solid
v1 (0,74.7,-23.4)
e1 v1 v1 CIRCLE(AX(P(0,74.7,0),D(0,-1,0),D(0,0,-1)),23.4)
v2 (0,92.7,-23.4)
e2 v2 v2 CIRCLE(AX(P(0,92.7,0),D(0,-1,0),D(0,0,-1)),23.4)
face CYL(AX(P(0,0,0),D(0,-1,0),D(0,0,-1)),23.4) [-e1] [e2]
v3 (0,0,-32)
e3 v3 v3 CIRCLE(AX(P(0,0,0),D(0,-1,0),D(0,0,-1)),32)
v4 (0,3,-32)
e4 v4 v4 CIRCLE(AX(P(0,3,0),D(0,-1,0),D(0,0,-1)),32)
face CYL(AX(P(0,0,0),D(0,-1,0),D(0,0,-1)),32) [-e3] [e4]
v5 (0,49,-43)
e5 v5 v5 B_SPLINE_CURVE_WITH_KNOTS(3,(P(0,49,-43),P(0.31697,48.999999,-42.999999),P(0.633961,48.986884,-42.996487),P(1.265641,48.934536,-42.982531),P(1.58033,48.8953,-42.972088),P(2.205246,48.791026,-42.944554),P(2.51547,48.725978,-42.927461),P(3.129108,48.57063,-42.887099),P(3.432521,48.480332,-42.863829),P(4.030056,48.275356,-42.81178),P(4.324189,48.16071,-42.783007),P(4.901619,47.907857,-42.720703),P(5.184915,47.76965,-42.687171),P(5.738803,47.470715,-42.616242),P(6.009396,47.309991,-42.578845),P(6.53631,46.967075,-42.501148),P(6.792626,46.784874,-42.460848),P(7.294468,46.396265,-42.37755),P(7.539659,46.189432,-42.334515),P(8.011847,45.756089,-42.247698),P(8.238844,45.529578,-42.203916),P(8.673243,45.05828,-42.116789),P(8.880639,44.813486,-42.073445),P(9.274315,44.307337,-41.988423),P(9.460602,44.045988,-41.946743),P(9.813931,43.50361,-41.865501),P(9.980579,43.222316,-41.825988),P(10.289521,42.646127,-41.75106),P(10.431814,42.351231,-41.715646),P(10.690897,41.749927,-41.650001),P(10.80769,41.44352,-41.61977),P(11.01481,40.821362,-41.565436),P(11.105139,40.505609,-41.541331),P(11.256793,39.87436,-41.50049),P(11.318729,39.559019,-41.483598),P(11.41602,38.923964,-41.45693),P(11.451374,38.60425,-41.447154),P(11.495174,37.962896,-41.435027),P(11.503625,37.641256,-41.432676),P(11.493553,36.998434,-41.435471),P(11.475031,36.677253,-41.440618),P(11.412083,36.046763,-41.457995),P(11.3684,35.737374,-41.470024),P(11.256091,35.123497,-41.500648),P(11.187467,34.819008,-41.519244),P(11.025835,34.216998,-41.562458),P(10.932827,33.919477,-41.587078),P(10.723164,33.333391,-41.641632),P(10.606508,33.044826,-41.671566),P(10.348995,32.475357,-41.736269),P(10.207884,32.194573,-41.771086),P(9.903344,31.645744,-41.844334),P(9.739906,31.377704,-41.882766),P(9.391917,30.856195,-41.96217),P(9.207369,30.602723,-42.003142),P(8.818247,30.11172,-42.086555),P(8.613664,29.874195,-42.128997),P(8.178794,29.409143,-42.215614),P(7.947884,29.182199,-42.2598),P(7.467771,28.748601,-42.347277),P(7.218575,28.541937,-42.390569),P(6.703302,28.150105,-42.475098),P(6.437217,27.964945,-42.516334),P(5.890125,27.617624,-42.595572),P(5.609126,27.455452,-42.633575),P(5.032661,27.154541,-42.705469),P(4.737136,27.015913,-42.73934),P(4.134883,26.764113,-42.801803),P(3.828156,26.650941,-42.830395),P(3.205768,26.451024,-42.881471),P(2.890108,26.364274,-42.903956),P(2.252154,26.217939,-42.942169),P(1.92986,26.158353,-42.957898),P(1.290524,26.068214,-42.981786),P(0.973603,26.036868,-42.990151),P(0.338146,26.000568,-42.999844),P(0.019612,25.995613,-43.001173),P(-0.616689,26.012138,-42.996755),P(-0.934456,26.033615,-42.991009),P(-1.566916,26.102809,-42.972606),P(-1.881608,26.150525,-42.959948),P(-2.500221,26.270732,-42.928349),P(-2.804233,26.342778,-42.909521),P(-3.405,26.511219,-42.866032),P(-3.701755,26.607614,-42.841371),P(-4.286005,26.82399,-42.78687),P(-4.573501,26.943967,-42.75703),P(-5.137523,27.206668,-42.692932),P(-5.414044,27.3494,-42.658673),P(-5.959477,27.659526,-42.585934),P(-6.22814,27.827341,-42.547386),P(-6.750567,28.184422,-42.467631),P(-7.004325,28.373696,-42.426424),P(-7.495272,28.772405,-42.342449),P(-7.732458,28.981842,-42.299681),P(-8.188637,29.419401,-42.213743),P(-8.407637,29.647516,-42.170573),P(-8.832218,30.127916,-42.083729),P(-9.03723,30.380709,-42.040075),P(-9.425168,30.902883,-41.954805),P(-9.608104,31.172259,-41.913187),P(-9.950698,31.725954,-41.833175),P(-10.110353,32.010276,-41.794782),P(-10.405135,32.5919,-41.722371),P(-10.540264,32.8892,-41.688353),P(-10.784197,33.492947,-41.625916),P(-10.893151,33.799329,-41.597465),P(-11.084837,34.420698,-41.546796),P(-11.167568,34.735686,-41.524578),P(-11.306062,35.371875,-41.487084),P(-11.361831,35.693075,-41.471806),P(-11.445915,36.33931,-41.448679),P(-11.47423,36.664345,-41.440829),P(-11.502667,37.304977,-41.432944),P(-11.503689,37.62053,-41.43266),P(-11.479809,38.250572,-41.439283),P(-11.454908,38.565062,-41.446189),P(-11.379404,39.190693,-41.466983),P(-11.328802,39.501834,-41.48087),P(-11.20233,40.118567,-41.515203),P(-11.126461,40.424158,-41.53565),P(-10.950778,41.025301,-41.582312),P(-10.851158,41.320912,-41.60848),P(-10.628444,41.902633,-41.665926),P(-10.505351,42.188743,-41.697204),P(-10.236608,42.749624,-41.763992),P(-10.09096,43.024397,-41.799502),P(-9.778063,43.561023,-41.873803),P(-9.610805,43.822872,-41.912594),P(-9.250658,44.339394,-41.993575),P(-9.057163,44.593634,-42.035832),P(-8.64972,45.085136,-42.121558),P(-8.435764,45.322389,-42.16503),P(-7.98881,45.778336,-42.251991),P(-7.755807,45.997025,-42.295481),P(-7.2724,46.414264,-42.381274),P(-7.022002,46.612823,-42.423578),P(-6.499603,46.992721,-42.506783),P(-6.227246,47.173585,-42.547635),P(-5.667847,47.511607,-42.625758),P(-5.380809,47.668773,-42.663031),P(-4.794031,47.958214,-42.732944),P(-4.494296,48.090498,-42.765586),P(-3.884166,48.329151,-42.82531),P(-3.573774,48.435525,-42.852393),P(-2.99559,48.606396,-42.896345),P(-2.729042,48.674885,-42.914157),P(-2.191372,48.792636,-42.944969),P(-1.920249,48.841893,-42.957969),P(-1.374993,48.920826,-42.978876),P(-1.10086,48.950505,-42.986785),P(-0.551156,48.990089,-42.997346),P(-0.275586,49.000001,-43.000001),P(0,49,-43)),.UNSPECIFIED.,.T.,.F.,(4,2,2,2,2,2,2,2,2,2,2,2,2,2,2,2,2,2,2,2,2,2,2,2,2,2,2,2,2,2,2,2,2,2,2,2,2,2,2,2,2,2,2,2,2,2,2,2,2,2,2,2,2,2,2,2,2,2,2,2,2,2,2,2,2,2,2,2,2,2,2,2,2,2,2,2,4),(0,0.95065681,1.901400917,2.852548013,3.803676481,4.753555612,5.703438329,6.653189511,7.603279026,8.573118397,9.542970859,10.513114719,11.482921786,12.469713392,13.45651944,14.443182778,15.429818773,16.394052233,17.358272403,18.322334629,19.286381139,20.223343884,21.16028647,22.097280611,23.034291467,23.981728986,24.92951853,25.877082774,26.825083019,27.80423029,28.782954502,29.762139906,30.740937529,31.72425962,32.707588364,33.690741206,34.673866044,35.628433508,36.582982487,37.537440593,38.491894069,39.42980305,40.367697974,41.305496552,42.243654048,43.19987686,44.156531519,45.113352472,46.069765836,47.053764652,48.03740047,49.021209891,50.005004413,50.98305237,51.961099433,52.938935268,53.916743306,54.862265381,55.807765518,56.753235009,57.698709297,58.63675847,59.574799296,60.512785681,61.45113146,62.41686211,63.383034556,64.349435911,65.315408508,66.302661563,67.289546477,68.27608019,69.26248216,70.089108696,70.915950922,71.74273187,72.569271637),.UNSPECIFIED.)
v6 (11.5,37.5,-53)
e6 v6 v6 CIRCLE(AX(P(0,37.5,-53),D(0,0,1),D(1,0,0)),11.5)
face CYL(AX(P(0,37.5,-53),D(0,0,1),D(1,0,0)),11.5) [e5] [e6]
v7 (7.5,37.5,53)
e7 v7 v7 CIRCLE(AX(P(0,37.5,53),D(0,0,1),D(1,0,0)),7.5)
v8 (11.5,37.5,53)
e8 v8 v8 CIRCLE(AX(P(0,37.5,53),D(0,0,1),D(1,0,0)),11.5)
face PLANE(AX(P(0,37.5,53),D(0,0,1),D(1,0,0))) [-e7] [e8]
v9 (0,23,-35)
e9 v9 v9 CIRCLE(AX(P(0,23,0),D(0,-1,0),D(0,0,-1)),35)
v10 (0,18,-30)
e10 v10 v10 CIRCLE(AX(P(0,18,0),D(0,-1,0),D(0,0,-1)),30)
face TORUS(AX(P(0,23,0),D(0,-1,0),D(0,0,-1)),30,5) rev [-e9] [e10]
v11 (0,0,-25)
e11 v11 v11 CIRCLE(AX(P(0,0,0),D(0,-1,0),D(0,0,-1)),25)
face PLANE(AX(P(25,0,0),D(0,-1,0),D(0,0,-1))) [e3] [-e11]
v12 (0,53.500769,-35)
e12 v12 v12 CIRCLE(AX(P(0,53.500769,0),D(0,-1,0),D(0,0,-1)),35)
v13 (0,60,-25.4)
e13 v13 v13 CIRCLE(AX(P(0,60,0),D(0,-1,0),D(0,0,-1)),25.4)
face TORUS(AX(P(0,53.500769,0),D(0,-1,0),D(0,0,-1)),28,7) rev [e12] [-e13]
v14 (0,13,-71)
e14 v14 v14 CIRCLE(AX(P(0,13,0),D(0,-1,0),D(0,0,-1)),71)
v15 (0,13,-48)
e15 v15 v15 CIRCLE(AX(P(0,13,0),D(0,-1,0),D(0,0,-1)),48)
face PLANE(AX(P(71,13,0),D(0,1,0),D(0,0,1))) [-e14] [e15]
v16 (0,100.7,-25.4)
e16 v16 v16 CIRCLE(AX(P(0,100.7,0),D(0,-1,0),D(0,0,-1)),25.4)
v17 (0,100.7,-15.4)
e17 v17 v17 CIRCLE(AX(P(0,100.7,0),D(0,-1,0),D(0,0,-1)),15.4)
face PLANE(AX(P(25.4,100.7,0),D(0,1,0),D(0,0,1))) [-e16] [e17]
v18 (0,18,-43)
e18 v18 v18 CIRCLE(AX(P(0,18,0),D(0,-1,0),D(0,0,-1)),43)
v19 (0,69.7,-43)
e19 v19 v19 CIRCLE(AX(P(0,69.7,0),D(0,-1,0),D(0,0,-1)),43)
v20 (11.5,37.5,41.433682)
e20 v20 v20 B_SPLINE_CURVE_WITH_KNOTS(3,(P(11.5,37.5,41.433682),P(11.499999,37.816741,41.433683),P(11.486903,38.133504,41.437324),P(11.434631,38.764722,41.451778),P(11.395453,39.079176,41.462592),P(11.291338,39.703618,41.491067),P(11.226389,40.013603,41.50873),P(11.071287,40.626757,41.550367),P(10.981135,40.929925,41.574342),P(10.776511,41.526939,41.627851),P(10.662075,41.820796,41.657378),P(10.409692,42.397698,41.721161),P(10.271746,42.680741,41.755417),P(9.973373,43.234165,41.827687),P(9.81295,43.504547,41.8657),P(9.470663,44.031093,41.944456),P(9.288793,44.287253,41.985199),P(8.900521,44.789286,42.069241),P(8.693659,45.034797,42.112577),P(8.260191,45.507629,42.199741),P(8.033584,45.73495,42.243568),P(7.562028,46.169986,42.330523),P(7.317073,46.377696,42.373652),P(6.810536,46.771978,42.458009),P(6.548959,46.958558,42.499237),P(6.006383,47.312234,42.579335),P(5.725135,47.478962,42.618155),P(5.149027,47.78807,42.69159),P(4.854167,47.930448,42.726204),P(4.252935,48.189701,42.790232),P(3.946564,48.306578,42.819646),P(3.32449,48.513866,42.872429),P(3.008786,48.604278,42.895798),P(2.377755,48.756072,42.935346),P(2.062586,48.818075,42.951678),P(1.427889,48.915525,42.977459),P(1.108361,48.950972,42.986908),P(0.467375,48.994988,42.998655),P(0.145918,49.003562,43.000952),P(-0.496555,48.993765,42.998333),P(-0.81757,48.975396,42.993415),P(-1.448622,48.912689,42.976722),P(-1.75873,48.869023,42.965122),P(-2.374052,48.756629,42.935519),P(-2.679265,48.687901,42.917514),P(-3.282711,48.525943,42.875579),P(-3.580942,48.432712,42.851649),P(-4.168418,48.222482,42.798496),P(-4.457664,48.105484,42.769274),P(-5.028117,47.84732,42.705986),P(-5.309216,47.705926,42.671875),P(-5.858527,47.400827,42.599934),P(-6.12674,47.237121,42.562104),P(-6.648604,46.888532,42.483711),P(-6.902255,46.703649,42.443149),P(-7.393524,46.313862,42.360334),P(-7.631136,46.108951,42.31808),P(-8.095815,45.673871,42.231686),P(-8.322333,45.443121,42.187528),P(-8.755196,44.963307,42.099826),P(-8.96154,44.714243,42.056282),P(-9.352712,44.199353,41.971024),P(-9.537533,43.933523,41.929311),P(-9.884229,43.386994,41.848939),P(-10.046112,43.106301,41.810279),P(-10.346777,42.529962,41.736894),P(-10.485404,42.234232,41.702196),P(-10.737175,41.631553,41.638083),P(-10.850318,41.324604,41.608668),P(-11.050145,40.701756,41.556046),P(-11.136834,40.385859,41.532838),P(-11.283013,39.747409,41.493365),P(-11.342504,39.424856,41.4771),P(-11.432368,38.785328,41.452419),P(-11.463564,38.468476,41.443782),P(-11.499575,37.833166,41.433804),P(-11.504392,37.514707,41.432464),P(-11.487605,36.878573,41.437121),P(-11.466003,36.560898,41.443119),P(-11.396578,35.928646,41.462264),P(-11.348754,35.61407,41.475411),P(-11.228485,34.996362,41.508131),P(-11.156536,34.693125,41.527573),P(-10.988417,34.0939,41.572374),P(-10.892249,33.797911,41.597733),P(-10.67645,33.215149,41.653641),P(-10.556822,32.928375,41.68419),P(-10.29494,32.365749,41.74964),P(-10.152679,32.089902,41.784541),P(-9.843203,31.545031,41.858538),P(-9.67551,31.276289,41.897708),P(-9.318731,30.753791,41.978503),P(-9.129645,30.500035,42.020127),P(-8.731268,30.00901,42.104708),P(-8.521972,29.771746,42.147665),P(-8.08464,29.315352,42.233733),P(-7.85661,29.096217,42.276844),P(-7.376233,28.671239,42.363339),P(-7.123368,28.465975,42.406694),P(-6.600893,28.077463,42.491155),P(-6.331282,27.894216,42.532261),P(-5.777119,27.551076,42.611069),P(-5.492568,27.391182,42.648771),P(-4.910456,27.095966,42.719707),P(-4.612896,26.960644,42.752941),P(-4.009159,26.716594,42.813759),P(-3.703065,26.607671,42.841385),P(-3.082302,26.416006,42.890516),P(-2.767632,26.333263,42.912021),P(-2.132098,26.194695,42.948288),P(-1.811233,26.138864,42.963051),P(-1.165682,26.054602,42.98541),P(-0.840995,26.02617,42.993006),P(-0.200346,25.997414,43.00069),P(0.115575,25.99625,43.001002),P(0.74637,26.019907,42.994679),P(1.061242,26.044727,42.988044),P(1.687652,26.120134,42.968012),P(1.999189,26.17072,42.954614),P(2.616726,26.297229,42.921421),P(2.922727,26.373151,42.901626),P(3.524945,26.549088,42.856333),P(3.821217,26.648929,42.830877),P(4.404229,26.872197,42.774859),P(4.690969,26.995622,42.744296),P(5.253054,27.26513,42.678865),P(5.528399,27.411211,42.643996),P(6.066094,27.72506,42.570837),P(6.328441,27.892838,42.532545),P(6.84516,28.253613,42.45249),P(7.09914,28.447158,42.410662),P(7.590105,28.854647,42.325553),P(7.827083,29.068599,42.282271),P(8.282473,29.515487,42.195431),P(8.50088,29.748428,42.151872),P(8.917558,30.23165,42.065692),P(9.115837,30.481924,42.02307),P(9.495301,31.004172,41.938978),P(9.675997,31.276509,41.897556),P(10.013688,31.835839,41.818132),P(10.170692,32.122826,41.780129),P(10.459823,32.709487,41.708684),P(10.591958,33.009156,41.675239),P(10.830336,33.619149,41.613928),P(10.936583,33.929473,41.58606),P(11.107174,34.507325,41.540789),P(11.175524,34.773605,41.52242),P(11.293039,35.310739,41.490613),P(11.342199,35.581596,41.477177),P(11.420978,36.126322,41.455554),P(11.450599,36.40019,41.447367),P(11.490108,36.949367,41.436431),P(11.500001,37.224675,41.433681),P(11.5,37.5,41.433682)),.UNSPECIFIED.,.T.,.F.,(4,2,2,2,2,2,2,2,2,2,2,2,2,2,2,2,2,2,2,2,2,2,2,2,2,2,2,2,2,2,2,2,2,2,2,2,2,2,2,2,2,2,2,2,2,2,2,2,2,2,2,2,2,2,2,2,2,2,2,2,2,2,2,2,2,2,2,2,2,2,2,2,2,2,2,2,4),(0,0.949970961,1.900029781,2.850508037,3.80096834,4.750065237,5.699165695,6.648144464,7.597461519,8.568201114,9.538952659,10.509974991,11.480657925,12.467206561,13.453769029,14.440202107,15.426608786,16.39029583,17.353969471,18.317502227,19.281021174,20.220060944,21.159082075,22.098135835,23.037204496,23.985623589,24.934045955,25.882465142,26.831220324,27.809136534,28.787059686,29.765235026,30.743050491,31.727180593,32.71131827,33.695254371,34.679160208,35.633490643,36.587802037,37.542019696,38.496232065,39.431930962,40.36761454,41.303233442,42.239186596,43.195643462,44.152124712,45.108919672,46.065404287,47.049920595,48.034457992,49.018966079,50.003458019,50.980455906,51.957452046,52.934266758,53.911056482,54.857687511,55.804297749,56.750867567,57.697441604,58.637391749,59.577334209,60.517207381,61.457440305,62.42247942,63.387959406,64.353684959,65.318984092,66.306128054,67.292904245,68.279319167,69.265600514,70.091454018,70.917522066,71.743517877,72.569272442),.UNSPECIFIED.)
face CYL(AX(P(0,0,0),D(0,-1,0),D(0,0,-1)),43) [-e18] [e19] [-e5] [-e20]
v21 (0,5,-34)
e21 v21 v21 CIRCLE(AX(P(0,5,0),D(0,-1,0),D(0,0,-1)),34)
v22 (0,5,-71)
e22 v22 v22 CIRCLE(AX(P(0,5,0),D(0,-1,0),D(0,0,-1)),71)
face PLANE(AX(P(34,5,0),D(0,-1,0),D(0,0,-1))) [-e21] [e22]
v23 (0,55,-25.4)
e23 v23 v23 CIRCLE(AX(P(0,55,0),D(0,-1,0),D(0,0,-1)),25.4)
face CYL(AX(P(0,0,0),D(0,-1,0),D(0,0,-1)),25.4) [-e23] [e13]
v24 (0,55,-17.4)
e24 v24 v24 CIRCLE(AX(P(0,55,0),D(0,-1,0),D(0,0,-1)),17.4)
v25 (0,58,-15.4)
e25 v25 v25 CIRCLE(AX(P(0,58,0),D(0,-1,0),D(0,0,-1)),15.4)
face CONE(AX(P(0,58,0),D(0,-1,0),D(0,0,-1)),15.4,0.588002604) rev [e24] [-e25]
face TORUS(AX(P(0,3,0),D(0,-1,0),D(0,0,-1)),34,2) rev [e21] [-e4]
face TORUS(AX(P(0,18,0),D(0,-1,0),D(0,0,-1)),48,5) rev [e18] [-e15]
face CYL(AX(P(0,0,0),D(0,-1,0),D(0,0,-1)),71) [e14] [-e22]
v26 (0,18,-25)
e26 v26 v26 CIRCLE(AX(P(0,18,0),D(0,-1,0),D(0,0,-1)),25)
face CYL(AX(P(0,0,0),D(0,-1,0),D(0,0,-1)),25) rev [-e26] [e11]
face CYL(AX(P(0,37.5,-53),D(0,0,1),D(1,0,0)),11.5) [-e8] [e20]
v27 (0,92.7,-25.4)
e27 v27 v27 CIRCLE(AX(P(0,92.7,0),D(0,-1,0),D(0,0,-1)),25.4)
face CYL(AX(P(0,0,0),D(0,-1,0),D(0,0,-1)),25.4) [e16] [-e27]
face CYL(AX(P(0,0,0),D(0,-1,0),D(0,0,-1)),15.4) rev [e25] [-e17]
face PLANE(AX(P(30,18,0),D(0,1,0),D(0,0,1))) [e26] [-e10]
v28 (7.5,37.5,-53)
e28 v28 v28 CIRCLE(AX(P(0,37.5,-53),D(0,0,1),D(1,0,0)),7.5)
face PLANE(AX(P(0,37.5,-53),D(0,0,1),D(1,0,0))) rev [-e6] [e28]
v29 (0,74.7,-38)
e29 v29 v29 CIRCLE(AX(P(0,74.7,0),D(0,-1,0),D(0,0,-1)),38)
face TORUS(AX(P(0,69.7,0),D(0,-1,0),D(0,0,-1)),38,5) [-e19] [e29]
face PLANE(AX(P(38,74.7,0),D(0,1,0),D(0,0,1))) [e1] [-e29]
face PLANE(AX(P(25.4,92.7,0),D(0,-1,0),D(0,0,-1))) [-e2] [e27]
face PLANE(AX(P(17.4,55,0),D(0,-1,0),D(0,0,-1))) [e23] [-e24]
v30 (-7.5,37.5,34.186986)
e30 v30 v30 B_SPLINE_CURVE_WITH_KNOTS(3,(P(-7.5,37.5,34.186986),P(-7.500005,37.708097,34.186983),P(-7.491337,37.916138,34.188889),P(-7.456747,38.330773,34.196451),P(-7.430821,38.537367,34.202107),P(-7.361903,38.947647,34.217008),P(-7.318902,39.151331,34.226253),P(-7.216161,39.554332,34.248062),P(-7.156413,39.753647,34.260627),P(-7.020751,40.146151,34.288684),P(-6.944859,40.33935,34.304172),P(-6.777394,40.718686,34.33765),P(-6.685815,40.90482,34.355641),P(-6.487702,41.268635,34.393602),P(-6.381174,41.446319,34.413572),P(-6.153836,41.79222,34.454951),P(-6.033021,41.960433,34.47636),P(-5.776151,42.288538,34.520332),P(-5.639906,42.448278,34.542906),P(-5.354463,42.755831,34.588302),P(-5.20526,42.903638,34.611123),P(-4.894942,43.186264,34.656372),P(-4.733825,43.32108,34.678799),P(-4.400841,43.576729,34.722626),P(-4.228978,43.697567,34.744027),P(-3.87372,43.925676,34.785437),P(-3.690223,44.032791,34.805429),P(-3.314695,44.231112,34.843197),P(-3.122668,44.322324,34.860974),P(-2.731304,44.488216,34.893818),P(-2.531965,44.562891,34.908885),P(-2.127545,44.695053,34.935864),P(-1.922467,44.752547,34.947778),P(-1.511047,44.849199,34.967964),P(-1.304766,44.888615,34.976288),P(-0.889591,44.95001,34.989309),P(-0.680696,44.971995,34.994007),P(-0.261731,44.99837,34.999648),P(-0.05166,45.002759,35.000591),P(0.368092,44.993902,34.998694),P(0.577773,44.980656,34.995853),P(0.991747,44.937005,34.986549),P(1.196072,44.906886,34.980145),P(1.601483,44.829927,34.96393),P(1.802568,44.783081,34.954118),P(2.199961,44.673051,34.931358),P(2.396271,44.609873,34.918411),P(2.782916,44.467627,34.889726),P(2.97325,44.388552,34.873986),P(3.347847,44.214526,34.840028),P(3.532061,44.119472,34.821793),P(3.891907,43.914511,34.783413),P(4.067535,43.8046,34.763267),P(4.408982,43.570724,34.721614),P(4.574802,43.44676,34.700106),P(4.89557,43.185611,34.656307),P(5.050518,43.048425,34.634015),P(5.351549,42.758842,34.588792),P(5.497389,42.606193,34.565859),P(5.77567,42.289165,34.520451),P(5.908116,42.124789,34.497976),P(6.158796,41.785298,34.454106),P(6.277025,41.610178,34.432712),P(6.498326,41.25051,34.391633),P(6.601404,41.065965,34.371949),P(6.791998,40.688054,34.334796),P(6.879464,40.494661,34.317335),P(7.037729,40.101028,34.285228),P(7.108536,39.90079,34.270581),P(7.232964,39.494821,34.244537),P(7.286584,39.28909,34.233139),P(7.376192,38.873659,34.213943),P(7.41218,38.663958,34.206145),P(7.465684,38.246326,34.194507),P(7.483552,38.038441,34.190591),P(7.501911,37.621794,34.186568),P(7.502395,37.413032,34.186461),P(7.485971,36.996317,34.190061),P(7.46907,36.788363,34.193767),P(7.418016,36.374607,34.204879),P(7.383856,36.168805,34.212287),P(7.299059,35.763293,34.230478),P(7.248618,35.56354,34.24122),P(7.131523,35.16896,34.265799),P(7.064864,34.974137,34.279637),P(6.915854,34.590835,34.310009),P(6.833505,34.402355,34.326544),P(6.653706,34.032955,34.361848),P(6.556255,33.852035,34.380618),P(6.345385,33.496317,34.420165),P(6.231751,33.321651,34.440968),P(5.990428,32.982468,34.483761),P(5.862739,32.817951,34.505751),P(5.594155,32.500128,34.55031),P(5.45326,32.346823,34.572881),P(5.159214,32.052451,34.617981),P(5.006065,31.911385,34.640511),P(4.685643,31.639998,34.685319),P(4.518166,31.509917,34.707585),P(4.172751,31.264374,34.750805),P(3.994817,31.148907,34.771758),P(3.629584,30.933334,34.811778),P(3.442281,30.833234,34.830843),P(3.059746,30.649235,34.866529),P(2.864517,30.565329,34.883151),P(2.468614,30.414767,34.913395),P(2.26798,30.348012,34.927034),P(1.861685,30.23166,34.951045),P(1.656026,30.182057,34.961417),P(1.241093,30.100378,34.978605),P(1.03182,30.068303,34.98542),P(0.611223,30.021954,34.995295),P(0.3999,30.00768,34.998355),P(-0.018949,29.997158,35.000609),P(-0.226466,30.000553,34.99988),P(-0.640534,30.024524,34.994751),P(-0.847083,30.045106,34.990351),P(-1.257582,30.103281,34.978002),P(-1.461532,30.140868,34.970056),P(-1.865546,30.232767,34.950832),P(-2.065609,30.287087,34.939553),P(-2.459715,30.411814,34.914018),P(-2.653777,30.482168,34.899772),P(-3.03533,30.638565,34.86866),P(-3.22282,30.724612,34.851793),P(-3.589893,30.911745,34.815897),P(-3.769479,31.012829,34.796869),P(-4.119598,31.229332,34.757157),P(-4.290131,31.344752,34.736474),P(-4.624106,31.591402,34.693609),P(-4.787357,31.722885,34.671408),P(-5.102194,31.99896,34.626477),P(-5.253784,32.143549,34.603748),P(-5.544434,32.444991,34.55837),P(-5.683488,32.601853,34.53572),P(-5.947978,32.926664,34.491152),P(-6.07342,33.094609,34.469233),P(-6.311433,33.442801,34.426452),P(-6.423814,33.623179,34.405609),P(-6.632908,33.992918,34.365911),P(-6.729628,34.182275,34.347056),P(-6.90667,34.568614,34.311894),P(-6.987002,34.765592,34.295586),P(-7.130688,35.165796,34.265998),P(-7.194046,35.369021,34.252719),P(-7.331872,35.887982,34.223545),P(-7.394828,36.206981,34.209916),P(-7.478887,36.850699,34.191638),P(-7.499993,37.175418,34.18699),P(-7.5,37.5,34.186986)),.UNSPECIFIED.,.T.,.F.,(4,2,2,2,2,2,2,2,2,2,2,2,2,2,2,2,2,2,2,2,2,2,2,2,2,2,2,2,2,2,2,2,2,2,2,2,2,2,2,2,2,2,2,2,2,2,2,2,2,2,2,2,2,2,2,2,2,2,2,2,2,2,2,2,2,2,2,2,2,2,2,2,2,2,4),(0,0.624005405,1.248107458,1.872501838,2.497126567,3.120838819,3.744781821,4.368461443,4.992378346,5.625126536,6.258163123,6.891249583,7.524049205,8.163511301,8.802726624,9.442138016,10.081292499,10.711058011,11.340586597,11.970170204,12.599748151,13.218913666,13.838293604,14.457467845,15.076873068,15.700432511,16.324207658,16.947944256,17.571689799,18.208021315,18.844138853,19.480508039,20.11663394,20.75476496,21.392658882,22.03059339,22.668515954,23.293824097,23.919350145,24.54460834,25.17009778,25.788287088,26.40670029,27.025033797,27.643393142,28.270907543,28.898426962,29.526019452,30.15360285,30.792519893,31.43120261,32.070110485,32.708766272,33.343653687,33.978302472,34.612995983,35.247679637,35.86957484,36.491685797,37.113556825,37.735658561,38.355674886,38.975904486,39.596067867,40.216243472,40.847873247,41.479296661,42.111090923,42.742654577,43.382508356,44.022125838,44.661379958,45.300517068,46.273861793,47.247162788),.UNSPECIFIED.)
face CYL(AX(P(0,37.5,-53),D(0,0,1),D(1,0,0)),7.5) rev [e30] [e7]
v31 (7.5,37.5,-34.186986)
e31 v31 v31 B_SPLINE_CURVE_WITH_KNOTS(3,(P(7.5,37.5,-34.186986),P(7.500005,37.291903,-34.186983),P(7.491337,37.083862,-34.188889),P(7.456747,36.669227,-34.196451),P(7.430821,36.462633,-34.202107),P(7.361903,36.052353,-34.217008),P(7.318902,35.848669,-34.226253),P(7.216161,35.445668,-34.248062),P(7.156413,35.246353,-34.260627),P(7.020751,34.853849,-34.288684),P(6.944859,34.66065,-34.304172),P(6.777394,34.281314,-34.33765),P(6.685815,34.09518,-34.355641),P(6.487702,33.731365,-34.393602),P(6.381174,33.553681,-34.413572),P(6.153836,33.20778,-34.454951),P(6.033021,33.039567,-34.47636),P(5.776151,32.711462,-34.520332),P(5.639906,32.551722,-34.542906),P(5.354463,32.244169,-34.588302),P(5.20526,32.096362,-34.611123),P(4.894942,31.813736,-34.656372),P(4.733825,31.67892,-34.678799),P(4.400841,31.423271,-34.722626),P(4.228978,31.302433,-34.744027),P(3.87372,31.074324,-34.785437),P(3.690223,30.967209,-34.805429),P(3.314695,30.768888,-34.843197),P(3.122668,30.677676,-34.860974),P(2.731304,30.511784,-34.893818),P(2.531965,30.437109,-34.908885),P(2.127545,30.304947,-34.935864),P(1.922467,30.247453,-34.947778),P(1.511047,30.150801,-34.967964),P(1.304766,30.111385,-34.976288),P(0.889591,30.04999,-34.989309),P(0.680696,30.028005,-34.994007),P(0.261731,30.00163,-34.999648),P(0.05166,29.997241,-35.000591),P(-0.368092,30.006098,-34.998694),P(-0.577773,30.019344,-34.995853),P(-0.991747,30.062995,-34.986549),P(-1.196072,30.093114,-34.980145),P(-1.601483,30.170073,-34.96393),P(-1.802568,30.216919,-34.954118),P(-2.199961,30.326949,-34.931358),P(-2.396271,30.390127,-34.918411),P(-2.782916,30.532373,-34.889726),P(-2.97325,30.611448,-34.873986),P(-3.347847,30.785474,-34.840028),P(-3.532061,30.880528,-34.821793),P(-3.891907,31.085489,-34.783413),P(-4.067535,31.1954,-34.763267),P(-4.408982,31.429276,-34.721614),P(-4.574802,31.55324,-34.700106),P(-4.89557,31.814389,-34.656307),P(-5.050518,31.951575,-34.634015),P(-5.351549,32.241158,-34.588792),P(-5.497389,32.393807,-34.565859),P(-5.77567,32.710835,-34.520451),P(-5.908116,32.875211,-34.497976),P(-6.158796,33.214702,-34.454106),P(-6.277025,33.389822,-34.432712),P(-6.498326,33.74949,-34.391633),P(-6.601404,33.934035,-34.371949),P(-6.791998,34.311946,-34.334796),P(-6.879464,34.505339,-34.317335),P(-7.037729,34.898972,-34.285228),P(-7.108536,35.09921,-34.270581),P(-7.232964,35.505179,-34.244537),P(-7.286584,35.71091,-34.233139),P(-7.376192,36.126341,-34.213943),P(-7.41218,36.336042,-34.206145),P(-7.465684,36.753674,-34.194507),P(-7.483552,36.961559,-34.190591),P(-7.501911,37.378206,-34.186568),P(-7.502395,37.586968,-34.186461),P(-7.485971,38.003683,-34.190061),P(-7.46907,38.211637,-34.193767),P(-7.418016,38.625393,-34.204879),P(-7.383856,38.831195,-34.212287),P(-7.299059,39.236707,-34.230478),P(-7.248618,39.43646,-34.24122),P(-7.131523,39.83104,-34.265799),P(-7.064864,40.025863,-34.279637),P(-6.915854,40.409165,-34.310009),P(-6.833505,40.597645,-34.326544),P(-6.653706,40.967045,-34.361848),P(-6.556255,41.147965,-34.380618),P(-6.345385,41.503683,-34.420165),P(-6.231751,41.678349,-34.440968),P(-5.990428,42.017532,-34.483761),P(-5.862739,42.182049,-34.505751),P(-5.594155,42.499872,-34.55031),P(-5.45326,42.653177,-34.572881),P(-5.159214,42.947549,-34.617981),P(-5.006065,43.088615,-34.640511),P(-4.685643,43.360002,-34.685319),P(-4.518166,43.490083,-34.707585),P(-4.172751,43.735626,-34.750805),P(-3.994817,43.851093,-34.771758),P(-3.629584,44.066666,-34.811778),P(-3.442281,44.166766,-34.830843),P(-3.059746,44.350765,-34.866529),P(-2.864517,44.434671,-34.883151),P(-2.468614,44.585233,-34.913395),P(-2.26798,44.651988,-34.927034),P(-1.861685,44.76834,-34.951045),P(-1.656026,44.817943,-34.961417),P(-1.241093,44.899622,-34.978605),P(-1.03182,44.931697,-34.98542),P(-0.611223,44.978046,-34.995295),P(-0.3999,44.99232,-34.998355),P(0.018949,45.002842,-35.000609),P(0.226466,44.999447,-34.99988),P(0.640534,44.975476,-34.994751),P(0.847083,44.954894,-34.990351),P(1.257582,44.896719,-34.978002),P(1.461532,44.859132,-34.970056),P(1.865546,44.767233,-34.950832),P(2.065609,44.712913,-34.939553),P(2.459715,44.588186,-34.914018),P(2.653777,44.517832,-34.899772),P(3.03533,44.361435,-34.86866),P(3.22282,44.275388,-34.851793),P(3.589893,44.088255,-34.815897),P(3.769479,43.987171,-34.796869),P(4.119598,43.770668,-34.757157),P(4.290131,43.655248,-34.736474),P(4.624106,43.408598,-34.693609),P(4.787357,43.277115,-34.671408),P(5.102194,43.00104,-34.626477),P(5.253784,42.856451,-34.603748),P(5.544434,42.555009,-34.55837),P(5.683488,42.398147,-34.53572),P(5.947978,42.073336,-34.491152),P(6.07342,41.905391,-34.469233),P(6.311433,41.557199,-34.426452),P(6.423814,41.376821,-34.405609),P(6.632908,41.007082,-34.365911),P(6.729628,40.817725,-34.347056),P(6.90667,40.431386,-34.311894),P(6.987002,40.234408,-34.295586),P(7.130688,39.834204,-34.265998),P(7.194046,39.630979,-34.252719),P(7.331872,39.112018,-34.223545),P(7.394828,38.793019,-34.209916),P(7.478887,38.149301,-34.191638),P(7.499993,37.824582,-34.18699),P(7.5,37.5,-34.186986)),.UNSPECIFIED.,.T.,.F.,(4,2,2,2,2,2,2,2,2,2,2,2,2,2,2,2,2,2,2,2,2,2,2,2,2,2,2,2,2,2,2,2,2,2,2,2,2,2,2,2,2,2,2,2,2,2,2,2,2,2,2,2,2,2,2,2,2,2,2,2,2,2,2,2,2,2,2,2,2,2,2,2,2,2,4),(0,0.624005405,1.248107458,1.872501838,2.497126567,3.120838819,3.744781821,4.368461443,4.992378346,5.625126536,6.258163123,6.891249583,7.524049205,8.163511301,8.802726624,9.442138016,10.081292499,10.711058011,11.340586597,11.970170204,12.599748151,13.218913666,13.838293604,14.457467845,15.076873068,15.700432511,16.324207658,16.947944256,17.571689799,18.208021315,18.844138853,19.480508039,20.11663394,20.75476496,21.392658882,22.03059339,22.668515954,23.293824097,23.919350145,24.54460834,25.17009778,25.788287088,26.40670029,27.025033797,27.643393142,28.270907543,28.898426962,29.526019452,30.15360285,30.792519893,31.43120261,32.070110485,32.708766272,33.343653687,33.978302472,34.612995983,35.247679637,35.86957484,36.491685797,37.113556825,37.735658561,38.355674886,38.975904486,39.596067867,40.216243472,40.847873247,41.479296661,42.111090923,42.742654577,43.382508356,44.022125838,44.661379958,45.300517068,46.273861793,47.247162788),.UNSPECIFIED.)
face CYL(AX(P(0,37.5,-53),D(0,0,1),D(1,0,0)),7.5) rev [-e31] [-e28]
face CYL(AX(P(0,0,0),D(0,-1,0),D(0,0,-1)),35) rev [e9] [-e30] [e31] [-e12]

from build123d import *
from build123d.topology import SkipClean

# Parameters (mm, degrees)
SALIENTE_EXTRUIR2_DEPTH      = 53
SALIENTE_EXTRUIR2_DEPTH_BACK = 53
CROQUIS2_R                   = 11.5
CROQUIS2_R_2                 = 7.5
CROQUIS3_R                   = 7.5
CORTAR_EXTRUIR1_DEPTH        = 175.807007869
CORTAR_EXTRUIR3_START        = 26.000000049
CORTAR_EXTRUIR3_OUTLINE_R    = 35
CORTAR_EXTRUIR3_DEPTH        = 23.000000051


# Read off the part's stored shape, not the designer's step: Cortar-Extruir3
with BuildPart() as part:
    # Croquis1 → Revolución3 (revolve)
    with BuildSketch(Plane.XY, mode=Mode.PRIVATE) as revoluci_n3_sk:
        with BuildLine():
            Line((32, 0), (32, 3))
            ThreePointArc((32, 3), (32.585786438, 4.414213562), (34, 5))
            Line((34, 5), (71, 5))
            Line((71, 5), (71, 13))
            Line((71, 13), (48, 13))
            ThreePointArc((48, 13), (44.464466094, 14.464466094), (43, 18))
            Line((43, 18), (43, 26))
            Line((43, 26), (43, 49))
            Line((43, 49), (43, 69.7))
            ThreePointArc((43, 69.7), (41.535533906, 73.235533906), (38, 74.7))
            Line((38, 74.7), (23.4, 74.7))
            Line((23.4, 74.7), (23.4, 92.7))
            Line((23.4, 92.7), (25.4, 92.7))
            Line((25.4, 92.7), (25.4, 100.7))
            Line((25.4, 100.7), (15.4, 100.7))
            Line((15.4, 100.7), (15.4, 58))
            Line((15.4, 58), (17.4, 55))
            Line((17.4, 55), (25.4, 55))
            Line((25.4, 55), (25.4, 60))
            ThreePointArc((25.4, 60), (31.924283374, 59.297319975), (35, 53.500769276))
            Line((35, 53.500769276), (35, 45))
            Line((35, 45), (35, 30))
            Line((35, 30), (35, 23))
            ThreePointArc((35, 23), (33.535533906, 19.464466094), (30, 18))
            Line((30, 18), (25, 18))
            Line((25, 18), (25, 0))
            Line((25, 0), (32, 0))
        make_face()
    revolve(revoluci_n3_sk.sketch.rotate(Axis((0, 0, 0), (0, 1, 0)), 90), axis=Axis((0, 0, 0), (0, 1, 0)))

    # Croquis2 → Saliente-Extruir2 (add, two sides: drawn at the far end of the back side and taken through both)
    with BuildSketch(Plane.XY.offset(-SALIENTE_EXTRUIR2_DEPTH_BACK)):
        with Locations((0, 37.5)):
            Circle(CROQUIS2_R)
        with Locations((0, 37.5)):
            Circle(CROQUIS2_R_2, mode=Mode.SUBTRACT)
    extrude(amount=SALIENTE_EXTRUIR2_DEPTH + SALIENTE_EXTRUIR2_DEPTH_BACK)

    # Croquis3 → Cortar-Extruir1 (cut, through all)
    with BuildSketch(Plane.XY.offset(53)):
        with Locations((0, 37.5)):
            Circle(CROQUIS3_R)
    extrude(amount=-CORTAR_EXTRUIR1_DEPTH, mode=Mode.SUBTRACT)

    # Cortar-Extruir3 outline → Cortar-Extruir3 (cut)
    with SkipClean():  # the faces are left unmerged after this step: merging them gives an invalid solid
        with BuildSketch(Plane(origin=(0, 0, 0), x_dir=(1, 0, 0), z_dir=(0, 1, 0)).offset(CORTAR_EXTRUIR3_START)):
            Circle(CORTAR_EXTRUIR3_OUTLINE_R)
        extrude(amount=CORTAR_EXTRUIR3_DEPTH, mode=Mode.SUBTRACT)


solid = part.part
